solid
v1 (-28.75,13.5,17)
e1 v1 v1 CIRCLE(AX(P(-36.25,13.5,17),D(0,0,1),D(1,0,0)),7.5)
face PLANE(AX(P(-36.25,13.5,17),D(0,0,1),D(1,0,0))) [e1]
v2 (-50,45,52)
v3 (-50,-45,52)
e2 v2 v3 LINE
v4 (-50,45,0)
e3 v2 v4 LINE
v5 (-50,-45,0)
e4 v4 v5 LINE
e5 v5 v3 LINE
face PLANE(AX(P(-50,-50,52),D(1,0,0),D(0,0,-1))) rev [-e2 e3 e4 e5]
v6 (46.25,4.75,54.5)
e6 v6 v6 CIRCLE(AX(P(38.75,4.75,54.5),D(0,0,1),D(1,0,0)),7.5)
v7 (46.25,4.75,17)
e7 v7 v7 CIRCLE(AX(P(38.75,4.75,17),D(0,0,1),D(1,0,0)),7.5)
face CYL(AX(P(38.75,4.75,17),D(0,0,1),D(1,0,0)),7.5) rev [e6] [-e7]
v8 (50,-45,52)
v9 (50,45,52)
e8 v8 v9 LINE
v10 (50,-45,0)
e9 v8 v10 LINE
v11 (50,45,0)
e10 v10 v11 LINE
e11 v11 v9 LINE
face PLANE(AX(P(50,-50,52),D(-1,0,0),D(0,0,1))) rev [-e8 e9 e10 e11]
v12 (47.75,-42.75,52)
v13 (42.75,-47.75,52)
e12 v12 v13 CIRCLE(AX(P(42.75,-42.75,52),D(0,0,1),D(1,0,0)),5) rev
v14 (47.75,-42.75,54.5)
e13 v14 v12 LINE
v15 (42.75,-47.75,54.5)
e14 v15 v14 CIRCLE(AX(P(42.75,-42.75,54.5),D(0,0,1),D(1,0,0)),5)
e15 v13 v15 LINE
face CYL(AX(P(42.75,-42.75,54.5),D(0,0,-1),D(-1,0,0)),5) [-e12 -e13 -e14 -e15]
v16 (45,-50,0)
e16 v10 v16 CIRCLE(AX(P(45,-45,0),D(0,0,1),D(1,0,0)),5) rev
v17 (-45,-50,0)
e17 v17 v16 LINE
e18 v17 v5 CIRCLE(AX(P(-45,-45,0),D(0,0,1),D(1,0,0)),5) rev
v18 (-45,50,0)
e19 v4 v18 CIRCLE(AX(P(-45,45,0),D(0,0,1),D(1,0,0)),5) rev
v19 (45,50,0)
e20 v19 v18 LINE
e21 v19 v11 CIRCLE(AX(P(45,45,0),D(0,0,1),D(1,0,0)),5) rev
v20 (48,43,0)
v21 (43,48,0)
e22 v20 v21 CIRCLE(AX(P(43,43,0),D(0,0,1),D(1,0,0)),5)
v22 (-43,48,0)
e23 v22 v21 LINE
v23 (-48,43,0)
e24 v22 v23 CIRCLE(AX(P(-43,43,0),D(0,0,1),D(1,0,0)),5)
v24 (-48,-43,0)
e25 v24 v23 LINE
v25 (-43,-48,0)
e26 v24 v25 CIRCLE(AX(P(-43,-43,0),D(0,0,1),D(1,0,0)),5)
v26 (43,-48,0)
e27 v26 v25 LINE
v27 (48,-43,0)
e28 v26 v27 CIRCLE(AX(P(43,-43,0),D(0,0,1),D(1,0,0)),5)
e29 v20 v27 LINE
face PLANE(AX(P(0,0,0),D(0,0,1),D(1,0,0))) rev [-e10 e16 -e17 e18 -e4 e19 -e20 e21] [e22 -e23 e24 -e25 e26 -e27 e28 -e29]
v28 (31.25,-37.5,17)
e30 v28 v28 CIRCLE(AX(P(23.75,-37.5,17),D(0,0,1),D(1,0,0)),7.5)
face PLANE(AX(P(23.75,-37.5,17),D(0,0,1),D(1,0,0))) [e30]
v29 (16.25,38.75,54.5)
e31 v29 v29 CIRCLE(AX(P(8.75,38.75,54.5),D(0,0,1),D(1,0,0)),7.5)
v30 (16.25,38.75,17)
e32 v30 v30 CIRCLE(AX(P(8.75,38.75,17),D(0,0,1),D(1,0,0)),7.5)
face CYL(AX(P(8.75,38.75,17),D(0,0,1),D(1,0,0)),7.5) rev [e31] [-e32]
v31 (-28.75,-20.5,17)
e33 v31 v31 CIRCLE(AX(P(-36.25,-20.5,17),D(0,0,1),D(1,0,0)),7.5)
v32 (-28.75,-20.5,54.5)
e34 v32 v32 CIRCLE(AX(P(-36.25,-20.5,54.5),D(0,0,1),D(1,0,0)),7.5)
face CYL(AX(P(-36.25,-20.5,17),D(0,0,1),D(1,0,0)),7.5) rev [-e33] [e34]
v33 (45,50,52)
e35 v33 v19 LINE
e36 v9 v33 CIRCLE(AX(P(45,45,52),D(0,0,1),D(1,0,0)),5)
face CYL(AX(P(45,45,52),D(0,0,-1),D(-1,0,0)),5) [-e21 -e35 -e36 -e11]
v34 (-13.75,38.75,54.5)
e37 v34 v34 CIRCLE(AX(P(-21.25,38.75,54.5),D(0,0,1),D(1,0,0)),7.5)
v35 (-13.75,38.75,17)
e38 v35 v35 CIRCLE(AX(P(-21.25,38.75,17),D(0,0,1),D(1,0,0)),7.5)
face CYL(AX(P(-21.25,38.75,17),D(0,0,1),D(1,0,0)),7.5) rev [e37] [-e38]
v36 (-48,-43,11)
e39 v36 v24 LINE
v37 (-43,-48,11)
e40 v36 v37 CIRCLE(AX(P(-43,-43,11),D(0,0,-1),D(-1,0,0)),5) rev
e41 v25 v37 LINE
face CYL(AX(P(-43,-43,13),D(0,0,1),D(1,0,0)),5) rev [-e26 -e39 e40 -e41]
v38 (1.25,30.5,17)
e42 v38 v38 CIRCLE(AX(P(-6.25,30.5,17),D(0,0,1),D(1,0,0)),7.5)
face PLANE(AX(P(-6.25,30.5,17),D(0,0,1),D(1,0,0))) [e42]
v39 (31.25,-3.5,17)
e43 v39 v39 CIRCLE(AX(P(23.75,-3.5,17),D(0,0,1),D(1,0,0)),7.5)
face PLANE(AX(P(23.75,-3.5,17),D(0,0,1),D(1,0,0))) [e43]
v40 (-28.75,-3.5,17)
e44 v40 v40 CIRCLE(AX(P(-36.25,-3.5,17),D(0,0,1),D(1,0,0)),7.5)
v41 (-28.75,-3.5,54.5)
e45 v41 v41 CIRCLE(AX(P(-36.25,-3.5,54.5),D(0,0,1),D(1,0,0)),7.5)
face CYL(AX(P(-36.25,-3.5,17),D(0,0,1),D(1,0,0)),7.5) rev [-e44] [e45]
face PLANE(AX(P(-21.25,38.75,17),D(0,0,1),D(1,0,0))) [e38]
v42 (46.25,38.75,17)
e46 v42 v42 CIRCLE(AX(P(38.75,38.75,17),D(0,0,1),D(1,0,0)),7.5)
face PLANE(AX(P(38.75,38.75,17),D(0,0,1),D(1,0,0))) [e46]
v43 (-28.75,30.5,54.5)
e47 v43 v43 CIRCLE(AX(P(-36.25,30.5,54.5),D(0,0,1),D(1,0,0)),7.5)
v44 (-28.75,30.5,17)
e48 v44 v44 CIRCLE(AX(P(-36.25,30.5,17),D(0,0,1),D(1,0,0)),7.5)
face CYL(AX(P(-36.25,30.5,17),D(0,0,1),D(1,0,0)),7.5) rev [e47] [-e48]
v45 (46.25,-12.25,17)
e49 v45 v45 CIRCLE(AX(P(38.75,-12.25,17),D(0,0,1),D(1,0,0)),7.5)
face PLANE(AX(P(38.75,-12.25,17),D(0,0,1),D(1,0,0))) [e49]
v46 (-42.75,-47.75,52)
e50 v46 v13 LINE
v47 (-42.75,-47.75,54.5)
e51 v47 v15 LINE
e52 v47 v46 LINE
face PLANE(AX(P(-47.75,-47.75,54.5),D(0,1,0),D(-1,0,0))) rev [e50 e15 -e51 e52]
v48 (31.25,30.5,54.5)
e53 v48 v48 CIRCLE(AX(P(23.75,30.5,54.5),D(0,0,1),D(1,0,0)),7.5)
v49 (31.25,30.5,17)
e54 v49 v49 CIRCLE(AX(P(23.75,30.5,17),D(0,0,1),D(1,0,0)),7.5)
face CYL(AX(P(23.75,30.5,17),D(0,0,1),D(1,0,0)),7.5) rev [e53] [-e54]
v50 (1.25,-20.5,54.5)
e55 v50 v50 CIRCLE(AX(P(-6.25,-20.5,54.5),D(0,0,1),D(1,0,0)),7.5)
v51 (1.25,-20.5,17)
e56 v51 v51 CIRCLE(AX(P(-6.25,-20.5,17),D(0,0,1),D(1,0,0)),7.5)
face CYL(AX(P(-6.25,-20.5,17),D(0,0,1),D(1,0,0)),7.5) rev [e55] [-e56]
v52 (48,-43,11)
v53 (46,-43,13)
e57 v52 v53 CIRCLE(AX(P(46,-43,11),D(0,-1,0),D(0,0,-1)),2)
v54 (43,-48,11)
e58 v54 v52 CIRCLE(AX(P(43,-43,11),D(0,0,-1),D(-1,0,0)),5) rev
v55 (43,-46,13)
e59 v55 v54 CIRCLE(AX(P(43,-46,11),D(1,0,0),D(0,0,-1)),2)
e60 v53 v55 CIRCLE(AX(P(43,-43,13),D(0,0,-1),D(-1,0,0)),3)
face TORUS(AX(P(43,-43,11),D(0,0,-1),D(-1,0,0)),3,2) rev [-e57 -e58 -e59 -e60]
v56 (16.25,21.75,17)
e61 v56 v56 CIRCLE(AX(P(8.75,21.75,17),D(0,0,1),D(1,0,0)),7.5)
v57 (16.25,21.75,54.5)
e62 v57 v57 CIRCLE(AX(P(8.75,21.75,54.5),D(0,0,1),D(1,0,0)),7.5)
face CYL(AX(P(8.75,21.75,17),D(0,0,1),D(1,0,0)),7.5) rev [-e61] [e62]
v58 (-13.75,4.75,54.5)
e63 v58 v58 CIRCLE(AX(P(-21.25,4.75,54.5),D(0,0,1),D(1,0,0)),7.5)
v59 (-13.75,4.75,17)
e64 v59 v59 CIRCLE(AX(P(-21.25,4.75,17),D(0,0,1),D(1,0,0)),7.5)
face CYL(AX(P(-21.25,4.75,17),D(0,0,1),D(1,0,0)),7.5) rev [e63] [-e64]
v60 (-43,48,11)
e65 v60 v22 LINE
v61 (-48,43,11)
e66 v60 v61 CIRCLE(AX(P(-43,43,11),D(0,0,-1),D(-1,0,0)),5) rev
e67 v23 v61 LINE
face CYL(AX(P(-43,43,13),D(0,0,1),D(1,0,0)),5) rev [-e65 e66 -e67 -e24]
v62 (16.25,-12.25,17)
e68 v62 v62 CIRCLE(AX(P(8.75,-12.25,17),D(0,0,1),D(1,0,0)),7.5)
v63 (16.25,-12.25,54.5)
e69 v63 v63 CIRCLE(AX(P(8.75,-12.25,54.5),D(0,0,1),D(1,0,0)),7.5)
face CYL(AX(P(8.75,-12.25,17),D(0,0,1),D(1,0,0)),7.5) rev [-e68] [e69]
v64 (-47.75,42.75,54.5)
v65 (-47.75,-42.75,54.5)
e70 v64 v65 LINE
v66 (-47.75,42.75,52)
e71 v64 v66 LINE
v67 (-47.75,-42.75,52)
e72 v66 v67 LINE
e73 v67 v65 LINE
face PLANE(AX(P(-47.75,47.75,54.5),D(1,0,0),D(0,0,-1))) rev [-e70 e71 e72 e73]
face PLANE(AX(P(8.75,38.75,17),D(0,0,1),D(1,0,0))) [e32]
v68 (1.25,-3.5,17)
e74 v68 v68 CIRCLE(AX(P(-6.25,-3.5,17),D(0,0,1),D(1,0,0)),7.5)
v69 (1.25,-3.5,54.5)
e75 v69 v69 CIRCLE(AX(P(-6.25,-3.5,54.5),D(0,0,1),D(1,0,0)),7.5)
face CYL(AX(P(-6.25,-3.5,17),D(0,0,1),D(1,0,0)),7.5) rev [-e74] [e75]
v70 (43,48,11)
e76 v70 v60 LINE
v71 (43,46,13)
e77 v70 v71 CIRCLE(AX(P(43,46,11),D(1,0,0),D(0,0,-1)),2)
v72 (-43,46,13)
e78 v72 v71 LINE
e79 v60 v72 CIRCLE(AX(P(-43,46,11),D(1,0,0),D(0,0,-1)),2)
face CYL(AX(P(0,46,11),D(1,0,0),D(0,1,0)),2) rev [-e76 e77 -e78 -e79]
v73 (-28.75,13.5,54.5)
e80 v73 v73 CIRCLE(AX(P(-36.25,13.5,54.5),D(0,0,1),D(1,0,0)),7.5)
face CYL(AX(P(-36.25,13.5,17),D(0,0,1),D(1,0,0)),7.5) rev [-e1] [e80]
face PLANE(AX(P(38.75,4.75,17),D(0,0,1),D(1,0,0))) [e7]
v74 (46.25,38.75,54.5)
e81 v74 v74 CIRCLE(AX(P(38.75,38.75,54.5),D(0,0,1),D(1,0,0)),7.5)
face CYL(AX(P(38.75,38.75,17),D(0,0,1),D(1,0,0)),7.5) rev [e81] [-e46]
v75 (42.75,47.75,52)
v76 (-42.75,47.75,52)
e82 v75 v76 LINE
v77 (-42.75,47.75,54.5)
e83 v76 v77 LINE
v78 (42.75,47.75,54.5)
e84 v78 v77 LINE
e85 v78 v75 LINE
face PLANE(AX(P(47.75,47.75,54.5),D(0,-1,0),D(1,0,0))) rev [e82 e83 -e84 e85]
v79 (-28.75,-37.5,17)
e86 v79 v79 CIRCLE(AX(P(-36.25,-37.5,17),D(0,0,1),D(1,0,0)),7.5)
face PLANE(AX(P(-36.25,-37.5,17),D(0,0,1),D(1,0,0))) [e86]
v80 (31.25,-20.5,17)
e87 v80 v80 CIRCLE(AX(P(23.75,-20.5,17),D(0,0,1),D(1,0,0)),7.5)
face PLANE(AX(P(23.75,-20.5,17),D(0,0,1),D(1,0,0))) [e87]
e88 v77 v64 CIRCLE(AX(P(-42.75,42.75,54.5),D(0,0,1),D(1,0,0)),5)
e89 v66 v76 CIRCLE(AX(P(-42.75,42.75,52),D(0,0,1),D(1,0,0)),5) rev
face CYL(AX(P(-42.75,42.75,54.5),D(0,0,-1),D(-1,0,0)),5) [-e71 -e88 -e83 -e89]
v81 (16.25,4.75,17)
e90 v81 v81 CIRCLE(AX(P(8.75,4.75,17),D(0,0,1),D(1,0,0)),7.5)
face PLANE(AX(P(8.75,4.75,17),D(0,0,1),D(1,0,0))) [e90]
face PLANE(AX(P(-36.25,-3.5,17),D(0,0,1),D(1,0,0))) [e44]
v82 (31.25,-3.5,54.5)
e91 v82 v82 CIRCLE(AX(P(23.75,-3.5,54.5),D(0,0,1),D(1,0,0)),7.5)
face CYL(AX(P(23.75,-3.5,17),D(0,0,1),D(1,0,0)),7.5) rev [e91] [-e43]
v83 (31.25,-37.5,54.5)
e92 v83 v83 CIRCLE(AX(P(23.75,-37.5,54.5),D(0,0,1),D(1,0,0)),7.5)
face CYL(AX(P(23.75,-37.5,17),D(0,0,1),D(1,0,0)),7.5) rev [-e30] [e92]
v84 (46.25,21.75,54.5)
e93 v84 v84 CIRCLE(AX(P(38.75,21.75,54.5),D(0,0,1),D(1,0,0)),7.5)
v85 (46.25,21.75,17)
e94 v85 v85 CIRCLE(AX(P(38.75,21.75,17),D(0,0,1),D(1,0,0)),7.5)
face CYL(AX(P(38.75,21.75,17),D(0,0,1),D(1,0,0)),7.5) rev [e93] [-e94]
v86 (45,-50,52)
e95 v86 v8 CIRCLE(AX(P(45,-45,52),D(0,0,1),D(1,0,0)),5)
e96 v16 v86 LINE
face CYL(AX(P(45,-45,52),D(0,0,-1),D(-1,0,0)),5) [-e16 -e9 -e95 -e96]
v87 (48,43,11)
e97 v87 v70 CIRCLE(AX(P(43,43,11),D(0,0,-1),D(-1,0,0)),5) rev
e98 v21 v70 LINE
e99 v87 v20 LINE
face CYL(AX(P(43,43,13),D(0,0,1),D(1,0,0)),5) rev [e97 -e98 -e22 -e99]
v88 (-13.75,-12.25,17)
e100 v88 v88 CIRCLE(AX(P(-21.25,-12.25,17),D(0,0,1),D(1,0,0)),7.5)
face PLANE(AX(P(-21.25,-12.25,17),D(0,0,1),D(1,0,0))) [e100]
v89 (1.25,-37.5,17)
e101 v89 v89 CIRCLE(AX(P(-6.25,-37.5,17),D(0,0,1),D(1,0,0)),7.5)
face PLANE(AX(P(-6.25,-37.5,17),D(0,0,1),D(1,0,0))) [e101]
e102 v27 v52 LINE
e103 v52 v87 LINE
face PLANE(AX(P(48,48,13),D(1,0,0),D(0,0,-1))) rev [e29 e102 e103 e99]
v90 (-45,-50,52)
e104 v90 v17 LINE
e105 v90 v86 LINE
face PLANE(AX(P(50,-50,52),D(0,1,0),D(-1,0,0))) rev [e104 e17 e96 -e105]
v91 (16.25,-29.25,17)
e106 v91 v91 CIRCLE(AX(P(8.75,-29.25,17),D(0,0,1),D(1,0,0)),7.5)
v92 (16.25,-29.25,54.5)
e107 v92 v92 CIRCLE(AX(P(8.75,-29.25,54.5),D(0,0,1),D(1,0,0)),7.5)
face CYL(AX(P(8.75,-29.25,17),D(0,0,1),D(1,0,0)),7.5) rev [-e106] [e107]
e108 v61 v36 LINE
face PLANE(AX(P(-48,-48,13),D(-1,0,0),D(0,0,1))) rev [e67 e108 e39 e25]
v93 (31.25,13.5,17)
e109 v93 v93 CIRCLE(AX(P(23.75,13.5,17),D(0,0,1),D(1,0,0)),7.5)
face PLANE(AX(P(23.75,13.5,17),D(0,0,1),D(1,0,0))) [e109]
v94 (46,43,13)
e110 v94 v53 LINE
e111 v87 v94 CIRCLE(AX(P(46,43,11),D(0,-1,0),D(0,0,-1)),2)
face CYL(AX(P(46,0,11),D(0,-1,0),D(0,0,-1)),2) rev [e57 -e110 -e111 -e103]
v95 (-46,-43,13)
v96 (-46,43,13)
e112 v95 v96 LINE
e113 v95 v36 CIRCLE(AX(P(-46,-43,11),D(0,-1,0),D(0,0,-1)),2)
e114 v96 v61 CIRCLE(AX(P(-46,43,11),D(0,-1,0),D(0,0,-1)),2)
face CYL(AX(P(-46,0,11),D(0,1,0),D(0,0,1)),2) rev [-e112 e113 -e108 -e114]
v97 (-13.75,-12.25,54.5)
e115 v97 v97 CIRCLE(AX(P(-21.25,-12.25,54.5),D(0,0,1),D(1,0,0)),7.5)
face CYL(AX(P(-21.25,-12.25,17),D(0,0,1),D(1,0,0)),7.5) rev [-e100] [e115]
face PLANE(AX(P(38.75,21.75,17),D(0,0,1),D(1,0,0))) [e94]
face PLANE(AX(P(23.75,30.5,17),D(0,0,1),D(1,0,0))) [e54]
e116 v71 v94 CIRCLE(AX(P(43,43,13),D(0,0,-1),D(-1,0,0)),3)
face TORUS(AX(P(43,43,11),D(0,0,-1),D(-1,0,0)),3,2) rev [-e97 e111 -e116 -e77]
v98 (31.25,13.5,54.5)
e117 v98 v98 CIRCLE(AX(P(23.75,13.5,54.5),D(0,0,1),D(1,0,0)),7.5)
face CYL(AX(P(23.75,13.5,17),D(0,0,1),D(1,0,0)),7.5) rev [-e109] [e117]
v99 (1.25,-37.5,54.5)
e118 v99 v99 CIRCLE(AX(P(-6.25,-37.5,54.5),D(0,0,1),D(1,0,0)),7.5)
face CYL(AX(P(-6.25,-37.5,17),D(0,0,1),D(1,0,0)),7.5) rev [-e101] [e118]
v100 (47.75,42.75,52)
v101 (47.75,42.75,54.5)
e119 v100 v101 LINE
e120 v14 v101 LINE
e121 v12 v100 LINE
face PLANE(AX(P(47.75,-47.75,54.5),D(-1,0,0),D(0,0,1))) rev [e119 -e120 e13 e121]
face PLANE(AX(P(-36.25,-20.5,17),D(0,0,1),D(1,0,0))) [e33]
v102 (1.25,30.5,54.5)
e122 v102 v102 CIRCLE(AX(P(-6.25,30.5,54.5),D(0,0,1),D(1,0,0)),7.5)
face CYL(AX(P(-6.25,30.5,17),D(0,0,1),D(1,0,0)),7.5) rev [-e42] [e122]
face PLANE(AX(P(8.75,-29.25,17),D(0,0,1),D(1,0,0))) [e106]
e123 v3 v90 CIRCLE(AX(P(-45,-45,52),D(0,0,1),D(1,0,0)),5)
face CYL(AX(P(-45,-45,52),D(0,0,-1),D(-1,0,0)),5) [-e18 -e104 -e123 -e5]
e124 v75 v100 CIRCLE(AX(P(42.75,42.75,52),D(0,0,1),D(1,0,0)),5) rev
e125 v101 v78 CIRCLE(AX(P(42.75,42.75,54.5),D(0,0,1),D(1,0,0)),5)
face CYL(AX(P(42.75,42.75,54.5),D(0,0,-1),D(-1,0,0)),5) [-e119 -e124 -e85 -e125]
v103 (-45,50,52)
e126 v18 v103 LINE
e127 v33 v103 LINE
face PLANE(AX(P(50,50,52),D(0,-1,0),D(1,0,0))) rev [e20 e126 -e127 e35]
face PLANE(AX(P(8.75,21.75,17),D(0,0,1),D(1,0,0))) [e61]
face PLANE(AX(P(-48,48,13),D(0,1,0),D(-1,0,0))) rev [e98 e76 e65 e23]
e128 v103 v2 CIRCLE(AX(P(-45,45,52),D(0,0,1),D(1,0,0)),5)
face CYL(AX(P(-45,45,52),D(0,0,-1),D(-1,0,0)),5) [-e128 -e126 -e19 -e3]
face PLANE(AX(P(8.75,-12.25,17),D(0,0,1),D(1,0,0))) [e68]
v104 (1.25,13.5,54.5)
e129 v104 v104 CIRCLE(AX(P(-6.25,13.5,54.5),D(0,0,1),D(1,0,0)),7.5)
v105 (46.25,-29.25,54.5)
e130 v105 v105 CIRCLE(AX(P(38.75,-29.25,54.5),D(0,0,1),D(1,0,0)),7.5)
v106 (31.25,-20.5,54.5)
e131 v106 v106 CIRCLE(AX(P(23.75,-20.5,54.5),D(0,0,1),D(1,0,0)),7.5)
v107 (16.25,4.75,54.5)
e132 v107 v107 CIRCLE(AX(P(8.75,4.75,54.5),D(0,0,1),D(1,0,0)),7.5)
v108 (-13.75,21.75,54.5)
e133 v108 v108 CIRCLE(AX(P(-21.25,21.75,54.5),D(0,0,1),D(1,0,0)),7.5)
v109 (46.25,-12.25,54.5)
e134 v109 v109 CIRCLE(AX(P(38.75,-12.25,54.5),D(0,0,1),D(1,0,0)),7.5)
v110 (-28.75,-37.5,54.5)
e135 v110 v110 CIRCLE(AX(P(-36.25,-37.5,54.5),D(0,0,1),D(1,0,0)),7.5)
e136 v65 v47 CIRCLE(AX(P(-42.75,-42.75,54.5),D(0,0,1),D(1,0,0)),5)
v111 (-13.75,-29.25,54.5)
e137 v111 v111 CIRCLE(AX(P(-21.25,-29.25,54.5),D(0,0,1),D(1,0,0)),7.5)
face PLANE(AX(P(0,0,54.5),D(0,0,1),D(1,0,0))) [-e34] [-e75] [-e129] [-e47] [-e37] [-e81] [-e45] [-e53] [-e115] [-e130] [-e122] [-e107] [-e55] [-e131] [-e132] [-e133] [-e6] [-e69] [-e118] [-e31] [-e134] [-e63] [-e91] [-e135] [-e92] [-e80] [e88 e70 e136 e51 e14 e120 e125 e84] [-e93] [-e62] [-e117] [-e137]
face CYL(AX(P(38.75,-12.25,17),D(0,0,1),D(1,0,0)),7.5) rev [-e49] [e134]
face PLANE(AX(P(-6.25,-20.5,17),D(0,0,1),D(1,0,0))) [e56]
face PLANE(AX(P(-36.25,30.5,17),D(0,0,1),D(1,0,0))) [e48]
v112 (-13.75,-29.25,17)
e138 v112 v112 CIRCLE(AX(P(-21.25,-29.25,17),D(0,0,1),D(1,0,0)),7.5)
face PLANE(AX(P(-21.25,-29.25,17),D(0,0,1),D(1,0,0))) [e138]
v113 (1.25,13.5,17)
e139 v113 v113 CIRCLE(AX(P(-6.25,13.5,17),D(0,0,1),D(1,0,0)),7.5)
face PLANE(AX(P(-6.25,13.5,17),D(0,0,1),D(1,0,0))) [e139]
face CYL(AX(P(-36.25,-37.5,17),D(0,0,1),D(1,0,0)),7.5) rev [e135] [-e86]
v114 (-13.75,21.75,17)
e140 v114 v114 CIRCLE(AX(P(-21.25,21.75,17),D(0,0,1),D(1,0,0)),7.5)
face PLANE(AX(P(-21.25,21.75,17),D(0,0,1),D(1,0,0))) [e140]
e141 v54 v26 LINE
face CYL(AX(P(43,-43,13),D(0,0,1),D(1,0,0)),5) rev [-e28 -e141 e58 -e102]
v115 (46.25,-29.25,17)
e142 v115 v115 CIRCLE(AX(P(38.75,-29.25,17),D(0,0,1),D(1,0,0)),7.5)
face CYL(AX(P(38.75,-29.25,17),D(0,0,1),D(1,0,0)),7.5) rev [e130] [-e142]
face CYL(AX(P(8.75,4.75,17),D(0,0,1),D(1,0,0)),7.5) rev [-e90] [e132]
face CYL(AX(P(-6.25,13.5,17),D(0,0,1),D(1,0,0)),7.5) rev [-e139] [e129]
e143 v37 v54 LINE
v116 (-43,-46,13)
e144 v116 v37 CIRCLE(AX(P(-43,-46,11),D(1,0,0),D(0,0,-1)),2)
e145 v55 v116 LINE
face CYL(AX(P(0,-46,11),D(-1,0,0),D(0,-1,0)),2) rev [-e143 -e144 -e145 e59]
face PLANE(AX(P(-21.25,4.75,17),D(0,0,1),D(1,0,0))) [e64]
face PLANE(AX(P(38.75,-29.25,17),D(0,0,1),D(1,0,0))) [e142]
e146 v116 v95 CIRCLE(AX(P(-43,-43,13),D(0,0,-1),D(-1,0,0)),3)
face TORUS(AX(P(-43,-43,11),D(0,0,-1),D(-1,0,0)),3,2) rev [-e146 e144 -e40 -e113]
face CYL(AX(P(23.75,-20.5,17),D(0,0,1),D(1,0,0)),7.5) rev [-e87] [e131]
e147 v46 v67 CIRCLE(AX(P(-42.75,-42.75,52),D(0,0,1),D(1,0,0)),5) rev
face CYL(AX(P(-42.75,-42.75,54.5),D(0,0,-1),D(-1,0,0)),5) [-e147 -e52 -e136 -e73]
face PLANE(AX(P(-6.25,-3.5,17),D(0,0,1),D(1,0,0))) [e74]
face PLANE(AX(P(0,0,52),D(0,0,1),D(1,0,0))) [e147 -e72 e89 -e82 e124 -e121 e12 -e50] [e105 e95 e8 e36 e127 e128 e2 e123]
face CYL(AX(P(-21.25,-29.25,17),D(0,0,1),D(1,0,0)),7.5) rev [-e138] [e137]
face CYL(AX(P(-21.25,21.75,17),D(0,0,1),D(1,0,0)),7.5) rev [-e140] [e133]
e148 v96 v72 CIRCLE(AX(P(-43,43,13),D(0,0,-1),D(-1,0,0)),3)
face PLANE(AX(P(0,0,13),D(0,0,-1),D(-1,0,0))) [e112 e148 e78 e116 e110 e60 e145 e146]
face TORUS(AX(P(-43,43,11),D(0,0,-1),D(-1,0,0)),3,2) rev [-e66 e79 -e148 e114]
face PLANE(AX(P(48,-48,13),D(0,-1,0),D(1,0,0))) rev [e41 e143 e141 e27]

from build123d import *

# Parameters (mm, degrees)
SKETCH1_W                 = 100
SKETCH1_H                 = 100
BOSS_EXTRUDE1_DEPTH       = 52
SKETCH2_W                 = 95.5
SKETCH2_H                 = 95.5
BOSS_EXTRUDE2_DEPTH       = 2.5
SKETCH3_W                 = 96
SKETCH3_H                 = 96
CUT_EXTRUDE1_DEPTH        = 13
SKETCH4_R                 = 7.5
CUT_EXTRUDE2_DEPTH        = 37.5
LPATTERN1_COUNT           = 5
LPATTERN1_PITCH           = 17
LPATTERN1_COUNT_DIR2      = 3
LPATTERN1_PITCH_DIR2      = 30
SKETCH_PATTERN1_START     = 17
SKETCH_PATTERN1_OUTLINE_R = 7.5
SKETCH_PATTERN1_DEPTH     = 37.5
FILLET1_R                 = 5
FILLET2_R                 = 2


# Read off the part's stored shape, not the designer's step: Sketch-Pattern1
with BuildPart() as part:
    # Sketch1 → Boss-Extrude1 (new body)
    with BuildSketch(Plane.XY):
        Rectangle(SKETCH1_W, SKETCH1_H)
    extrude(amount=BOSS_EXTRUDE1_DEPTH)

    # Sketch2 → Boss-Extrude2 (add)
    with BuildSketch(Plane.XY.offset(52)):
        Rectangle(SKETCH2_W, SKETCH2_H)
    extrude(amount=BOSS_EXTRUDE2_DEPTH)

    # Sketch3 → Cut-Extrude1 (cut)
    with BuildSketch(Plane(origin=(0, 0, 0), x_dir=(-1, 0, 0), z_dir=(0, 0, -1))):
        Rectangle(SKETCH3_W, SKETCH3_H)
    extrude(amount=-CUT_EXTRUDE1_DEPTH, mode=Mode.SUBTRACT)

    # Sketch4 → Cut-Extrude2 (cut)
    with BuildSketch(Plane.XY.offset(54.5)):
        with Locations((38.75, 38.75)):
            Circle(SKETCH4_R)
    cut_extrude2 = extrude(amount=-CUT_EXTRUDE2_DEPTH, mode=Mode.SUBTRACT)

    # LPattern1: Cut-Extrude2 5 × 3
    with Locations(*[(-j * LPATTERN1_PITCH_DIR2, -i * LPATTERN1_PITCH, 0) for i in range(LPATTERN1_COUNT) for j in range(LPATTERN1_COUNT_DIR2) if (i, j) != (0, 0)]):
        add(cut_extrude2, mode=Mode.SUBTRACT)

    # Sketch-Pattern1 outline → Sketch-Pattern1 (cut)
    with BuildSketch(Plane.XY.offset(SKETCH_PATTERN1_START)):
        with Locations((23.75, 30.5)):
            Circle(SKETCH_PATTERN1_OUTLINE_R)
        with Locations((-36.25, 13.5)):
            Circle(SKETCH_PATTERN1_OUTLINE_R)
        with Locations((23.75, -3.5)):
            Circle(SKETCH_PATTERN1_OUTLINE_R)
        with Locations((-6.25, -3.5)):
            Circle(SKETCH_PATTERN1_OUTLINE_R)
        with Locations((-36.25, -3.5)):
            Circle(SKETCH_PATTERN1_OUTLINE_R)
        with Locations((-6.25, 13.5)):
            Circle(SKETCH_PATTERN1_OUTLINE_R)
        with Locations((23.75, 13.5)):
            Circle(SKETCH_PATTERN1_OUTLINE_R)
        with Locations((-36.25, 30.5)):
            Circle(SKETCH_PATTERN1_OUTLINE_R)
        with Locations((-6.25, 30.5)):
            Circle(SKETCH_PATTERN1_OUTLINE_R)
        with Locations((-36.25, -37.5)):
            Circle(SKETCH_PATTERN1_OUTLINE_R)
        with Locations((-6.25, -37.5)):
            Circle(SKETCH_PATTERN1_OUTLINE_R)
        with Locations((23.75, -20.5)):
            Circle(SKETCH_PATTERN1_OUTLINE_R)
        with Locations((-6.25, -20.5)):
            Circle(SKETCH_PATTERN1_OUTLINE_R)
        with Locations((-36.25, -20.5)):
            Circle(SKETCH_PATTERN1_OUTLINE_R)
        with Locations((23.75, -37.5)):
            Circle(SKETCH_PATTERN1_OUTLINE_R)
    extrude(amount=SKETCH_PATTERN1_DEPTH, mode=Mode.SUBTRACT)

    # Fillet1
    fillet1_edges = [part.edges().sort_by_distance(p)[0] for p in [
        (47.75, 47.75, 53.25),
        (-47.75, 47.75, 53.25),
        (-47.75, -47.75, 53.25),
        (47.75, -47.75, 53.25),
        (-48, -48, 6.5),
        (48, -48, 6.5),
        (48, 48, 6.5),
        (-48, 48, 6.5),
        (-50, 50, 26),
        (50, 50, 26),
        (50, -50, 26),
        (-50, -50, 26),
    ]]
    fillet(fillet1_edges, radius=FILLET1_R)

    # Fillet2
    fillet2_edges = [part.edges().sort_by_distance(p)[0] for p in [
        (0, -48, 13),
        (48, 0, 13),
        (-48, 0, 13),
        (0, 48, 13),
        (-46.535533906, 46.535533906, 13),
        (-46.535533906, -46.535533906, 13),
        (46.535533906, 46.535533906, 13),
        (46.535533906, -46.535533906, 13),
    ]]
    fillet(fillet2_edges, radius=FILLET2_R)


solid = part.part
